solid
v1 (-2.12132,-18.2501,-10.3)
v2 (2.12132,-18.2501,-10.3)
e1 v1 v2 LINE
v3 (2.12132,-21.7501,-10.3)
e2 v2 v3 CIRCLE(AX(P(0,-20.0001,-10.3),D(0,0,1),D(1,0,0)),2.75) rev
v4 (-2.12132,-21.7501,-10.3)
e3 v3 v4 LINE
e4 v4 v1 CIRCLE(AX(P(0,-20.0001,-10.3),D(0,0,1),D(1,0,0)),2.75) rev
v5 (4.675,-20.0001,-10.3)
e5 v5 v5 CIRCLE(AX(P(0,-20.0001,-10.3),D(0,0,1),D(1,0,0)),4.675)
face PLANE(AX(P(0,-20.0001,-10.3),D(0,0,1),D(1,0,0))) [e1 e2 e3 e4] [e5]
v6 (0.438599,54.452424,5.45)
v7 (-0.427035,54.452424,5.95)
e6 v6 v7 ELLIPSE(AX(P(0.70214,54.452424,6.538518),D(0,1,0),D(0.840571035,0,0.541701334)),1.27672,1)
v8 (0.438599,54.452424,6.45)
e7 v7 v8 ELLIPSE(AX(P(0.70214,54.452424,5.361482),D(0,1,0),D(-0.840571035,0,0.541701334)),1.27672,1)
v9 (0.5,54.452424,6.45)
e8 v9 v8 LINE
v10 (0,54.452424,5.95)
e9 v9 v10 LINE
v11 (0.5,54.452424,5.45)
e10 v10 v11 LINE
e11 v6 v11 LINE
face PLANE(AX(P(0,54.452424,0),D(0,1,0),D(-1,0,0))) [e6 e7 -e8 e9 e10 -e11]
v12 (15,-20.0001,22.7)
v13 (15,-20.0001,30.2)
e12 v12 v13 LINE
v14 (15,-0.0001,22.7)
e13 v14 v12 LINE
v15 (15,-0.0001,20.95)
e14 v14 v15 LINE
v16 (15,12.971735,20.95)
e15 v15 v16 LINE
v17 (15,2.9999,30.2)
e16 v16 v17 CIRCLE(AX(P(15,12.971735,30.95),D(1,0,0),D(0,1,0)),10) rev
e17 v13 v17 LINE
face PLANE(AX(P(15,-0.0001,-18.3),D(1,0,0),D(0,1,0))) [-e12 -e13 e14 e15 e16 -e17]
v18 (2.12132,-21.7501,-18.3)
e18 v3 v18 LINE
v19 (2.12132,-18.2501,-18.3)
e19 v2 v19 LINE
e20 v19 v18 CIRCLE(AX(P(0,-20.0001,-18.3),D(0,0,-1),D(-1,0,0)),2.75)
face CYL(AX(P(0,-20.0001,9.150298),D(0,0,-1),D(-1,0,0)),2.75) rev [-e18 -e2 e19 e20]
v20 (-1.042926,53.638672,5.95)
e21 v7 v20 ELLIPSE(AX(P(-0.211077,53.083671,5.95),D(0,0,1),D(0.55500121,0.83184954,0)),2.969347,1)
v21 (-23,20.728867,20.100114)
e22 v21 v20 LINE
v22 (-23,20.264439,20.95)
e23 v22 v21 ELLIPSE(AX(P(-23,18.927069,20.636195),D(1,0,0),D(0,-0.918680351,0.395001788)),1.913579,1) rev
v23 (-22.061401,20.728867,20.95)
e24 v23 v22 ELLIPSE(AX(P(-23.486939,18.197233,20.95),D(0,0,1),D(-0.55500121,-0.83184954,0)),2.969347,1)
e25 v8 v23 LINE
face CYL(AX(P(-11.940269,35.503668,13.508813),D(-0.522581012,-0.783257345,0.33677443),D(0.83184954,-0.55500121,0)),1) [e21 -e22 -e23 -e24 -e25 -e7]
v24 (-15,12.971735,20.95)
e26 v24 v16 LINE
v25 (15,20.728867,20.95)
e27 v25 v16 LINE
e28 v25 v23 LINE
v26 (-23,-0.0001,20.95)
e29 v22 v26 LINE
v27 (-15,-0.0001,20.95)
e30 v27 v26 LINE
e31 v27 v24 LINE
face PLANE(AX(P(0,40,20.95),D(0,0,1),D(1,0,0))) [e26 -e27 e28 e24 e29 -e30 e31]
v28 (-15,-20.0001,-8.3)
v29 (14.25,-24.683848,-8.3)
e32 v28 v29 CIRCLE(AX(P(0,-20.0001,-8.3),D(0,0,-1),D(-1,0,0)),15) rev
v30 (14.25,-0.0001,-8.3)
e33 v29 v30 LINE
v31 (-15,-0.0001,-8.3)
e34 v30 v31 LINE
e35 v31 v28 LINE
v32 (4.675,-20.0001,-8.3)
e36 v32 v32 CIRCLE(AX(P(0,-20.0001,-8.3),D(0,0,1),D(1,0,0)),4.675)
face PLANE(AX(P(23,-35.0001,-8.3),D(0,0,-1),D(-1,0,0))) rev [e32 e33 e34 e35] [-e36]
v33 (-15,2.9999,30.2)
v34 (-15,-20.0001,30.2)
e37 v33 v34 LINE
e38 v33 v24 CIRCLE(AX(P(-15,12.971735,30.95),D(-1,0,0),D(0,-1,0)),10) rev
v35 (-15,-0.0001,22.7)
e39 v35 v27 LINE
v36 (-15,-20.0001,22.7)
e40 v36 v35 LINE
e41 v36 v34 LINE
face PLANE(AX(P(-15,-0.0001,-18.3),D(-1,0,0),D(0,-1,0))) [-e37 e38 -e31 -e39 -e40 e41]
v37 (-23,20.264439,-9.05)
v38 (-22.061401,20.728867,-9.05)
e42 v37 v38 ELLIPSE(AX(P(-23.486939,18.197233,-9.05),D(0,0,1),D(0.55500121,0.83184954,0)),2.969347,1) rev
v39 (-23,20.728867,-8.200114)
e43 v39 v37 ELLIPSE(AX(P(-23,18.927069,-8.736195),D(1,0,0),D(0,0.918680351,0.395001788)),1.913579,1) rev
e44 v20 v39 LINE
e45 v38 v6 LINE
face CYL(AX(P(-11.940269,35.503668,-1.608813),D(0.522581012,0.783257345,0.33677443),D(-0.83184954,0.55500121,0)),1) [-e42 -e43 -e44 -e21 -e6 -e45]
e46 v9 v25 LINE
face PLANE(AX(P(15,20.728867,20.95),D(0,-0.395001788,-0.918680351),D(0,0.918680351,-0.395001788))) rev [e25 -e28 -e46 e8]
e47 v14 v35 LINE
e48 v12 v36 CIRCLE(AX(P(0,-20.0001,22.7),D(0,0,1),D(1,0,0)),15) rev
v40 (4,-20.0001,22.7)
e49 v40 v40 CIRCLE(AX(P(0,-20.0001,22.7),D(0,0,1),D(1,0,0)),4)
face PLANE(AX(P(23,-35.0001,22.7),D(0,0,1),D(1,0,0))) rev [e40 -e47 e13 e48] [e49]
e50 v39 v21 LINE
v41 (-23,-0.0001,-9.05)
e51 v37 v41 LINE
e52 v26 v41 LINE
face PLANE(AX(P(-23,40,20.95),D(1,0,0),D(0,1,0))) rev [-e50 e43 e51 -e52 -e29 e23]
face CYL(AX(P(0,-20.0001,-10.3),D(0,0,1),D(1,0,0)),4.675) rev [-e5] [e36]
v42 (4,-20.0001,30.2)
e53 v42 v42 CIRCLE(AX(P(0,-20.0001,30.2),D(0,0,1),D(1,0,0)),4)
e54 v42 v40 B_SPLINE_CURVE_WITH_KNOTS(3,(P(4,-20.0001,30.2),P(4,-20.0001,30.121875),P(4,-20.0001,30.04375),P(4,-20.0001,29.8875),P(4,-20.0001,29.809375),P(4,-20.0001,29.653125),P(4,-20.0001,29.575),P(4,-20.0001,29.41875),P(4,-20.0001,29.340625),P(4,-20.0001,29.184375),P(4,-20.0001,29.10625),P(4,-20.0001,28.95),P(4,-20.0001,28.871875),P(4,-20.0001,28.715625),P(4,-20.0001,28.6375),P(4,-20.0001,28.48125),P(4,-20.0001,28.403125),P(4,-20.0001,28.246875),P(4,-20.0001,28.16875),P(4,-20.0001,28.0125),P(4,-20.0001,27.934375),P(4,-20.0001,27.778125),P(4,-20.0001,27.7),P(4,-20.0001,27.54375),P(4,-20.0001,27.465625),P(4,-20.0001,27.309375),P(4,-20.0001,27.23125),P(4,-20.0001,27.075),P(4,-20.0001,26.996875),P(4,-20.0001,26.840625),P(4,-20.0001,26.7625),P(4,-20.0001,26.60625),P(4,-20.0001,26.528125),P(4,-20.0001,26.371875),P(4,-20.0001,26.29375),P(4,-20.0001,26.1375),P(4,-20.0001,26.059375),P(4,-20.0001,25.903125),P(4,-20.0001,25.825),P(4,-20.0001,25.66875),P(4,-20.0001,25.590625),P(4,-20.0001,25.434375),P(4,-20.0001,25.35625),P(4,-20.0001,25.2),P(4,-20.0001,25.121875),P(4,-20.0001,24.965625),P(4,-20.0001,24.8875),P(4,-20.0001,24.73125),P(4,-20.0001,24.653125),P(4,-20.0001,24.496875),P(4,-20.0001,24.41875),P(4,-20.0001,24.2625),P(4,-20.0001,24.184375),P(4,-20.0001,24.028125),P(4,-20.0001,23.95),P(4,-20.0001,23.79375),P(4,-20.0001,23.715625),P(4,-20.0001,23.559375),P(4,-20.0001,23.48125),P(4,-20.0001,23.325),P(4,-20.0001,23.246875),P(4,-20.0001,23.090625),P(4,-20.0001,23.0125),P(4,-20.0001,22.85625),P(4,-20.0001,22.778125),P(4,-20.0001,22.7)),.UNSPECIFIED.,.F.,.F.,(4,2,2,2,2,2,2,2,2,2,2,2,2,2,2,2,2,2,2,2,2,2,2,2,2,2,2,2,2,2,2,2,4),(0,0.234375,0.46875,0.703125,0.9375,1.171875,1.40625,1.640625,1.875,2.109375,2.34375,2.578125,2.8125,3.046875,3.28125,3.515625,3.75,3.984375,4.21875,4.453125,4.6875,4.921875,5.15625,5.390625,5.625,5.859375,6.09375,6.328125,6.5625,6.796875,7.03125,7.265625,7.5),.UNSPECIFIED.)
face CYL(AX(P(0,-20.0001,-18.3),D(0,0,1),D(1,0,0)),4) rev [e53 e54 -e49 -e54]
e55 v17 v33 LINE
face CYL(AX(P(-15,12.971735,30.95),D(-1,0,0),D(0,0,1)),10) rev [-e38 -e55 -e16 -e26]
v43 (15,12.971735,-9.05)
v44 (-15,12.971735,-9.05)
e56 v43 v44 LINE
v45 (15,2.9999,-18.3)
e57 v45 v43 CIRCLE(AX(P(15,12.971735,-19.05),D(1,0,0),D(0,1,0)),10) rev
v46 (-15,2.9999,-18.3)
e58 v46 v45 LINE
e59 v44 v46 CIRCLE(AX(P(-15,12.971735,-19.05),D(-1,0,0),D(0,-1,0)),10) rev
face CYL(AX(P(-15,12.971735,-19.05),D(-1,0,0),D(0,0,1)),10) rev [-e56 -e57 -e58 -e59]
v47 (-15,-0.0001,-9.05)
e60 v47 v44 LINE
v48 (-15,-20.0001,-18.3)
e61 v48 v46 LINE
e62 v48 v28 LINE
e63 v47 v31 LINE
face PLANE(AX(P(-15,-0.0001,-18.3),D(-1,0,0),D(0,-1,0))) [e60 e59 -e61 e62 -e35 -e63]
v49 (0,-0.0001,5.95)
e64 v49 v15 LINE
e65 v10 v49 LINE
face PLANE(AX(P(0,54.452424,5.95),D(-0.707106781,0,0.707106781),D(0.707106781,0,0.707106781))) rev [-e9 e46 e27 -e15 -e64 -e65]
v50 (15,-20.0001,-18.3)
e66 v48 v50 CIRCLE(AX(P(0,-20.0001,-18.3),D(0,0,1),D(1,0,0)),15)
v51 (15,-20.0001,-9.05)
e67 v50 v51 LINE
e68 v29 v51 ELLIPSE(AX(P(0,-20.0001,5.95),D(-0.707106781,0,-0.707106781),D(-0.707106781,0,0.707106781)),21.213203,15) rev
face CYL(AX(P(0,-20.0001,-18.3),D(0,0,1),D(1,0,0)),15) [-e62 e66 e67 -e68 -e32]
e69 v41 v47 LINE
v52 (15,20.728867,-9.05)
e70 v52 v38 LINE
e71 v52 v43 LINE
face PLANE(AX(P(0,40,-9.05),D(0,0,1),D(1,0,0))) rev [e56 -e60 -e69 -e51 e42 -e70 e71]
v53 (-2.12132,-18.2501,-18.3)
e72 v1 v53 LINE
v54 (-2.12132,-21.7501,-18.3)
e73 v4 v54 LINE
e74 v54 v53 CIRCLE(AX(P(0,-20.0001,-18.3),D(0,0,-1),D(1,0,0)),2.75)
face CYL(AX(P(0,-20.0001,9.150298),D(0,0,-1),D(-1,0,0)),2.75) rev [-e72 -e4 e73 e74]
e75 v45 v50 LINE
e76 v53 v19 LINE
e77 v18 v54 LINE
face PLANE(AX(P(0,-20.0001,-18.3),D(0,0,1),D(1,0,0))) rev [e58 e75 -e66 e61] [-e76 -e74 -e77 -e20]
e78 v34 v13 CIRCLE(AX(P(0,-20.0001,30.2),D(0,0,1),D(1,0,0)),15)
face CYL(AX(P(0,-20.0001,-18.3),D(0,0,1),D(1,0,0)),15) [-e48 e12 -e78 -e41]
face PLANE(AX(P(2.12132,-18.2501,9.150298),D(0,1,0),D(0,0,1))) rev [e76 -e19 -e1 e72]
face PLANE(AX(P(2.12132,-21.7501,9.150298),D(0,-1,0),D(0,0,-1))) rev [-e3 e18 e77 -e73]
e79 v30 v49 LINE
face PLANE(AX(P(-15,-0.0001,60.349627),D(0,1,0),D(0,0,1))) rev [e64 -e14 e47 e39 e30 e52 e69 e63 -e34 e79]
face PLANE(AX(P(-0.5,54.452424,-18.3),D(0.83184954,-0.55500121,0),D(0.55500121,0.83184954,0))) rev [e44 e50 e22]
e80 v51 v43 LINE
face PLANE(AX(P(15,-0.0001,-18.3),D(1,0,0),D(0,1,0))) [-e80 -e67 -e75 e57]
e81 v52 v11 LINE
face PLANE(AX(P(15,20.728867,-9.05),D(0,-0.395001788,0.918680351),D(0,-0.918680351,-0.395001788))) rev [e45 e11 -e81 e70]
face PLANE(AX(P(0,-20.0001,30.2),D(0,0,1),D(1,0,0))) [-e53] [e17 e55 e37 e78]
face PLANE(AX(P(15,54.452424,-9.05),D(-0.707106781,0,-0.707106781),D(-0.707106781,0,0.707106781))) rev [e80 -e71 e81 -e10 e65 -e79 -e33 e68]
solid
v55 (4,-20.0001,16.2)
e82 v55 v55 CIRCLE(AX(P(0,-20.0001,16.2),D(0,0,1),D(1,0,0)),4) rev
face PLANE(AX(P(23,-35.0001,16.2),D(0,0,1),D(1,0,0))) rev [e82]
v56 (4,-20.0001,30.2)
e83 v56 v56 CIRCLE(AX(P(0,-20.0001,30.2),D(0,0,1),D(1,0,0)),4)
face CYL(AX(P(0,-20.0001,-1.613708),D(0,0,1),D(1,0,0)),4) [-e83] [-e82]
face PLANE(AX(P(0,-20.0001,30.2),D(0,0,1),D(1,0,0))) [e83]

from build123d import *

# Parameters (mm, degrees)
BOSS_EXTRUDE1_DEPTH      = 20.95
BOSS_EXTRUDE2_START      = -9.05
BOSS_EXTRUDE2_DEPTH      = 9.05
SKETCH6_R                = 2
CUT_EXTRUDE2_DEPTH       = 10
CUT_EXTRUDE3_DEPTH       = 2.75
CUT_EXTRUDE4_DEPTH       = 67.499081444
CUT_EXTRUDE4_DEPTH_BACK  = 67.499081444
SKETCH8_W                = 8.290514233
SKETCH8_H                = 3.25
SKETCH11_R               = 11.15
BEARING_HOLE_DEPTH       = 7.3
SKETCH12_W               = 46
SKETCH12_H               = 30
BOSS_EXTRUDE3_DEPTH      = 0.0001
BOSS_EXTRUDE4_DEPTH      = 9.25
BOSS_EXTRUDE4_DEPTH_BACK = 39.25
SKETCH14_W               = 31
SKETCH14_H               = 35
CUT_EXTRUDE5_DEPTH       = 74.138005393
SKETCH15_R               = 4
CUT_EXTRUDE6_DEPTH       = 77.644489906
SKETCH17_R               = 6.169612062
BOSS_EXTRUDE5_DEPTH      = 10
SKETCH18_R               = 4
BOSS_EXTRUDE6_DEPTH      = 14
SKETCH19_R               = 4.675
CUT_EXTRUDE7_DEPTH       = 2
BOSS_EXTRUDE7_START      = -39.25
SKETCH20_W               = 30
SKETCH20_H               = 3
BOSS_EXTRUDE7_DEPTH      = 48.5
FILLET1_R                = 10
SKETCH22_W               = 17.22069039
SKETCH22_H               = 30
CUT_EXTRUDE8_DEPTH       = 67.589629634
SKETCH25_W               = 38.779549847
SKETCH25_H               = 44.55932685
CUT_EXTRUDE10_DEPTH      = 72.152584865
BOSS_EXTRUDE9_DEPTH      = 40
CUT_EXTRUDE11_DEPTH      = 73.945914552
CUT_EXTRUDE12_DEPTH      = 71.955119264
CUT_EXTRUDE13_DEPTH      = 63.342538471
FILLET2_R                = 1


with BuildPart() as part:
    # Sketch2 → Boss-Extrude1 (new body)
    with BuildSketch(Plane.XY):
        with BuildLine():
            Line((-14.709485767, 40), (-23, 40))
            Line((-23, 40), (-23, 0))
            Line((-23, 0), (23, 0))
            Line((23, 0), (23, 40))
            Line((23, 40), (14.709485767, 40))
            ThreePointArc((14.709485767, 40), (0, 54.709485767), (-14.709485767, 40))
        make_face()
        with BuildLine():
            Line((-7.55, 18.241114036), (-7.55, 14.75))
            Line((-7.55, 14.75), (7.55, 14.75))
            Line((7.55, 14.75), (7.55, 18.241114036))
            Line((7.55, 18.241114036), (9.25, 18.241114036))
            Line((9.25, 18.241114036), (9.25, 21.160258306))
            ThreePointArc((9.25, 21.160258306), (0, 46.25), (-9.25, 21.160258306))
            Line((-9.25, 21.160258306), (-9.25, 18.241114036))
            Line((-9.25, 18.241114036), (-7.55, 18.241114036))
        make_face(mode=Mode.SUBTRACT)
    extrude(amount=BOSS_EXTRUDE1_DEPTH)

    # Sketch3 → Boss-Extrude2 (add)
    with BuildSketch(Plane.XY.offset(BOSS_EXTRUDE2_START)):
        with BuildLine():
            Line((-14.709485767, 40), (-23, 40))
            Line((-23, 40), (-23, 0))
            Line((-23, 0), (23, 0))
            Line((23, 0), (23, 40))
            Line((23, 40), (14.709485767, 40))
            ThreePointArc((14.709485767, 40), (0, 54.709485767), (-14.709485767, 40))
        make_face()
    extrude(amount=BOSS_EXTRUDE2_DEPTH)

    # Sketch6 → Cut-Extrude2 (cut)
    with BuildSketch(Plane.XY.offset(20.95)):
        with Locations((-17.5, 32)):
            Circle(SKETCH6_R)
        with Locations((17.5, 32)):
            Circle(SKETCH6_R)
    extrude(amount=-CUT_EXTRUDE2_DEPTH, mode=Mode.SUBTRACT)

    # Sketch7 → Cut-Extrude3 (cut)
    with BuildSketch(Plane.XY.offset(20.95)):
        with BuildLine():
            Line((-17.5, 35.75), (17.5, 35.75))
            ThreePointArc((17.5, 35.75), (21.25, 32), (17.5, 28.25))
            Line((17.5, 28.25), (-17.5, 28.25))
            ThreePointArc((-17.5, 28.25), (-21.25, 32), (-17.5, 35.75))
        make_face()
    extrude(amount=-CUT_EXTRUDE3_DEPTH, mode=Mode.SUBTRACT)

    # Sketch8 → Cut-Extrude4 (cut, two sides: drawn at the far end of the back side and taken through both)
    with BuildSketch(Plane.XY.offset(20.95).offset(-CUT_EXTRUDE4_DEPTH_BACK)):
        with Locations((-18.854742884, 38.375)):
            Rectangle(SKETCH8_W, SKETCH8_H)
        with Locations((18.854742884, 38.375)):
            Rectangle(SKETCH8_W, SKETCH8_H)
    extrude(amount=CUT_EXTRUDE4_DEPTH + CUT_EXTRUDE4_DEPTH_BACK, mode=Mode.SUBTRACT)

    # Sketch11 → Bearing Hole (cut)
    with BuildSketch(Plane(origin=(0, 0, -9.05), x_dir=(-1, 0, 0), z_dir=(0, 0, -1))):
        with Locations((0, 40)):
            Circle(SKETCH11_R)
    extrude(amount=-BEARING_HOLE_DEPTH, mode=Mode.SUBTRACT)

    # Sketch12 → Boss-Extrude3 (add)
    with BuildSketch(Plane.XZ):
        with Locations((0, 5.95)):
            Rectangle(SKETCH12_W, SKETCH12_H)
    extrude(amount=BOSS_EXTRUDE3_DEPTH)

    # Sketch13 → Boss-Extrude4 (add, two sides: drawn at the far end of the back side and taken through both)
    with BuildSketch(Plane.XY.offset(20.95).offset(-BOSS_EXTRUDE4_DEPTH_BACK)):
        with BuildLine():
            Line((-15, -0.0001), (15, -0.0001))
            Line((15, -0.0001), (15, -20.0001))
            ThreePointArc((15, -20.0001), (0, -35.0001), (-15, -20.0001))
            Line((-15, -20.0001), (-15, -0.0001))
        make_face()
    extrude(amount=BOSS_EXTRUDE4_DEPTH + BOSS_EXTRUDE4_DEPTH_BACK)

    # Sketch14 → Cut-Extrude5 (cut, through all)
    with BuildSketch(Plane.ZY.offset(15)):
        with Locations((7.2, -17.5001)):
            Rectangle(SKETCH14_W, SKETCH14_H)
    extrude(amount=-CUT_EXTRUDE5_DEPTH, mode=Mode.SUBTRACT)


with BuildPart() as cut_extrude5_piece_1:
    # of the separate pieces the step leaves, piece 1, a body of its own (cut_extrude5_pieces)
    add(part.part.solids().sort_by_distance((14.709485767, 40, 20.95))[0])


with BuildPart() as cut_extrude5_piece_2:
    # of the separate pieces the step leaves, piece 2, a body of its own (cut_extrude5_pieces)
    add(part.part.solids().sort_by_distance((-15, -0.0001, 30.2))[0])


with BuildPart() as cut_extrude6_tool:
    # Sketch15 → Cut-Extrude6 (new, through all)
    with BuildSketch(Plane.XY.offset(30.2)):
        with Locations((0, -20.0001)):
            Circle(SKETCH15_R)
    extrude(amount=-CUT_EXTRUDE6_DEPTH)


with BuildPart() as cut_extrude5_piece_1_1:
    add(cut_extrude5_piece_1.part)

    # Cut-Extrude6: cut by cut_extrude6_tool
    add(cut_extrude6_tool.part, mode=Mode.SUBTRACT)

    # Sketch17 → Boss-Extrude5 (add)
    with BuildSketch(Plane(origin=(0, 0, -18.3), x_dir=(-1, 0, 0), z_dir=(0, 0, -1))):
        with Locations((0, -20.0001)):
            Circle(SKETCH17_R)
        with BuildLine():
            Line((-2.121320344, -18.2501), (2.121320344, -18.2501))
            ThreePointArc((2.121320344, -18.2501), (2.75, -20.0001), (2.121320344, -21.7501))
            Line((2.121320344, -21.7501), (-2.121320344, -21.7501))
            ThreePointArc((-2.121320344, -21.7501), (-2.75, -20.0001), (-2.121320344, -18.2501))
        make_face(mode=Mode.SUBTRACT)
    extrude(amount=-BOSS_EXTRUDE5_DEPTH)

    # Sketch19 → Cut-Extrude7 (cut)
    with BuildSketch(Plane.XY.offset(-8.3)):
        with Locations((0, -20.0001)):
            Circle(SKETCH19_R)
    extrude(amount=-CUT_EXTRUDE7_DEPTH, mode=Mode.SUBTRACT)



with BuildPart() as cut_extrude5_piece_2_1:
    add(cut_extrude5_piece_2.part)

    # Cut-Extrude6: cut by cut_extrude6_tool
    add(cut_extrude6_tool.part, mode=Mode.SUBTRACT)


with BuildPart() as body_3:
    # Sketch18 → Boss-Extrude6 (new body)
    with BuildSketch(Plane.XY.offset(30.2)):
        with Locations((0, -20.0001)):
            Circle(SKETCH18_R)
    extrude(amount=-BOSS_EXTRUDE6_DEPTH)


with BuildPart() as cut_extrude5_piece_1_2:
    add(cut_extrude5_piece_1_1.part)

    add(cut_extrude5_piece_2_1.part)  # Boss-Extrude7 merges Cut-Extrude5 piece 2
    # Sketch20 → Boss-Extrude7 (add)
    with BuildSketch(Plane.XY.offset(20.95).offset(BOSS_EXTRUDE7_START)):
        with Locations((0, 1.4999)):
            Rectangle(SKETCH20_W, SKETCH20_H)
    extrude(amount=BOSS_EXTRUDE7_DEPTH)

    # Fillet1
    # the kernel refuses this fillet: 10 mm, written as the material it adds along each edge
    with BuildSketch(Plane(origin=(-15, 2.9999, 20.95), x_dir=(0, 1, 0), z_dir=(1, 0, 0))) as fillet1_piece_1:
        with BuildLine():
            CenterArc((9.971835338, 10), FILLET1_R, 184.301222305, 85.698777695)
            Line((0, 9.25), (-0.199436707, 9.235))
            ThreePointArc((-0.199436707, 9.235), (-0.2, 4.625), (-0.2, 0))
            Line((-0.2, 0), (0, -0.2))
            Line((0, -0.2), (9.971835338, -0.2))
            Line((9.971835338, -0.2), (9.971835338, 0))
        make_face()
    extrude(amount=30)
    with BuildSketch(Plane(origin=(-15, 2.9999, -9.05), x_dir=(0, 0, -1), z_dir=(1, 0, 0))) as fillet1_piece_2:
        with BuildLine():
            CenterArc((10, 9.971835338), FILLET1_R, 180, 85.698777695)
            Line((0, 9.971835338), (-0.2, 9.971835338))
            Line((-0.2, 9.971835338), (-0.2, 0))
            Line((-0.2, 0), (0, -0.2))
            ThreePointArc((0, -0.2), (4.625, -0.2), (9.235, -0.199436707))
            Line((9.235, -0.199436707), (9.25, 0))
        make_face()
    extrude(amount=30)

    # Sketch22 → Cut-Extrude8 (cut, through all)
    with BuildSketch(Plane.XZ.offset(0.0001)):
        with Locations((23.610345195, 5.95)):
            Rectangle(SKETCH22_W, SKETCH22_H)
    extrude(amount=-CUT_EXTRUDE8_DEPTH, mode=Mode.SUBTRACT)

    # Sketch25 → Cut-Extrude10 (cut, through all)
    with BuildSketch(Plane(origin=(0, 0, -9.05), x_dir=(-1, 0, 0), z_dir=(0, 0, -1))):
        with Locations((3.610225076, 36.732087153)):
            Rectangle(SKETCH25_W, SKETCH25_H)
    extrude(amount=-CUT_EXTRUDE10_DEPTH, mode=Mode.SUBTRACT)

    # Sketch38 → Boss-Extrude9 (add)
    with BuildSketch(Plane(origin=(0, 14.452423728, 0), x_dir=(1, 0, 0), z_dir=(0, 1, 0))):
        Polygon((15, 9.05), (0, -5.95), (15, -20.95), (-23, -20.95), (-23, 9.05), align=None)
    extrude(amount=BOSS_EXTRUDE9_DEPTH)

    # Sketch39 → Cut-Extrude11 (cut, through all)
    with BuildSketch(Plane.ZY.offset(23)):
        Polygon((6.45, 54.452423728), (20.95, 54.452423728), (20.95, 20.728867261), align=None)
        Polygon((-9.05, 54.452423728), (-9.05, 20.728867261), (5.45, 54.452423728), align=None)
    extrude(amount=-CUT_EXTRUDE11_DEPTH, mode=Mode.SUBTRACT)

    # Sketch40 → Cut-Extrude12 (cut, through all)
    with BuildSketch(Plane.XY.offset(20.95)):
        Polygon((-23, 54.452423728), (-0.5, 54.452423728), (-23, 20.728867261), align=None)
    extrude(amount=-CUT_EXTRUDE12_DEPTH, mode=Mode.SUBTRACT)

    # Sketch41 → Cut-Extrude13 (cut, through all)
    with BuildSketch(Plane(origin=(0, 14.452423728, 0), x_dir=(1, 0, 0), z_dir=(0, 1, 0))):
        Polygon((15, 9.05), (0, -5.95), (15, -20.95), align=None)
    extrude(amount=-CUT_EXTRUDE13_DEPTH, mode=Mode.SUBTRACT)

    # Fillet2
    # the kernel refuses this fillet: 1 mm, written as the material it takes off along each edge
    with BuildSketch(Plane(origin=(0.545475798, 56.01940871, 5.77624893), x_dir=(-0.18691021617579237, -0.2801456546378411, -0.9415853563414492), z_dir=(-0.5225810121185461, -0.7832573453532435, 0.3367744300319518)), Plane(origin=(0.545475798, 56.01940871, 6.12375107), x_dir=(0.8525896350373701, -0.4800849077481965, -0.20642043401574758), z_dir=(-0.5225810121185461, -0.7832573453532435, -0.3367744300319518))) as fillet2_piece_1:
        with BuildLine():
            CenterArc((FILLET2_R * 0.800240172067, FILLET2_R), FILLET2_R, 192.663603939, 77.336396061)
            Line((-FILLET2_R * 0.175433828194, FILLET2_R * 0.78077352985), (0, 0))
            Line((0, 0), (FILLET2_R * 0.800240172067, 0))
        make_face()
    extrude(amount=47.056726182, mode=Mode.SUBTRACT)


solid = Compound([body_3.part, cut_extrude5_piece_1_2.part])
